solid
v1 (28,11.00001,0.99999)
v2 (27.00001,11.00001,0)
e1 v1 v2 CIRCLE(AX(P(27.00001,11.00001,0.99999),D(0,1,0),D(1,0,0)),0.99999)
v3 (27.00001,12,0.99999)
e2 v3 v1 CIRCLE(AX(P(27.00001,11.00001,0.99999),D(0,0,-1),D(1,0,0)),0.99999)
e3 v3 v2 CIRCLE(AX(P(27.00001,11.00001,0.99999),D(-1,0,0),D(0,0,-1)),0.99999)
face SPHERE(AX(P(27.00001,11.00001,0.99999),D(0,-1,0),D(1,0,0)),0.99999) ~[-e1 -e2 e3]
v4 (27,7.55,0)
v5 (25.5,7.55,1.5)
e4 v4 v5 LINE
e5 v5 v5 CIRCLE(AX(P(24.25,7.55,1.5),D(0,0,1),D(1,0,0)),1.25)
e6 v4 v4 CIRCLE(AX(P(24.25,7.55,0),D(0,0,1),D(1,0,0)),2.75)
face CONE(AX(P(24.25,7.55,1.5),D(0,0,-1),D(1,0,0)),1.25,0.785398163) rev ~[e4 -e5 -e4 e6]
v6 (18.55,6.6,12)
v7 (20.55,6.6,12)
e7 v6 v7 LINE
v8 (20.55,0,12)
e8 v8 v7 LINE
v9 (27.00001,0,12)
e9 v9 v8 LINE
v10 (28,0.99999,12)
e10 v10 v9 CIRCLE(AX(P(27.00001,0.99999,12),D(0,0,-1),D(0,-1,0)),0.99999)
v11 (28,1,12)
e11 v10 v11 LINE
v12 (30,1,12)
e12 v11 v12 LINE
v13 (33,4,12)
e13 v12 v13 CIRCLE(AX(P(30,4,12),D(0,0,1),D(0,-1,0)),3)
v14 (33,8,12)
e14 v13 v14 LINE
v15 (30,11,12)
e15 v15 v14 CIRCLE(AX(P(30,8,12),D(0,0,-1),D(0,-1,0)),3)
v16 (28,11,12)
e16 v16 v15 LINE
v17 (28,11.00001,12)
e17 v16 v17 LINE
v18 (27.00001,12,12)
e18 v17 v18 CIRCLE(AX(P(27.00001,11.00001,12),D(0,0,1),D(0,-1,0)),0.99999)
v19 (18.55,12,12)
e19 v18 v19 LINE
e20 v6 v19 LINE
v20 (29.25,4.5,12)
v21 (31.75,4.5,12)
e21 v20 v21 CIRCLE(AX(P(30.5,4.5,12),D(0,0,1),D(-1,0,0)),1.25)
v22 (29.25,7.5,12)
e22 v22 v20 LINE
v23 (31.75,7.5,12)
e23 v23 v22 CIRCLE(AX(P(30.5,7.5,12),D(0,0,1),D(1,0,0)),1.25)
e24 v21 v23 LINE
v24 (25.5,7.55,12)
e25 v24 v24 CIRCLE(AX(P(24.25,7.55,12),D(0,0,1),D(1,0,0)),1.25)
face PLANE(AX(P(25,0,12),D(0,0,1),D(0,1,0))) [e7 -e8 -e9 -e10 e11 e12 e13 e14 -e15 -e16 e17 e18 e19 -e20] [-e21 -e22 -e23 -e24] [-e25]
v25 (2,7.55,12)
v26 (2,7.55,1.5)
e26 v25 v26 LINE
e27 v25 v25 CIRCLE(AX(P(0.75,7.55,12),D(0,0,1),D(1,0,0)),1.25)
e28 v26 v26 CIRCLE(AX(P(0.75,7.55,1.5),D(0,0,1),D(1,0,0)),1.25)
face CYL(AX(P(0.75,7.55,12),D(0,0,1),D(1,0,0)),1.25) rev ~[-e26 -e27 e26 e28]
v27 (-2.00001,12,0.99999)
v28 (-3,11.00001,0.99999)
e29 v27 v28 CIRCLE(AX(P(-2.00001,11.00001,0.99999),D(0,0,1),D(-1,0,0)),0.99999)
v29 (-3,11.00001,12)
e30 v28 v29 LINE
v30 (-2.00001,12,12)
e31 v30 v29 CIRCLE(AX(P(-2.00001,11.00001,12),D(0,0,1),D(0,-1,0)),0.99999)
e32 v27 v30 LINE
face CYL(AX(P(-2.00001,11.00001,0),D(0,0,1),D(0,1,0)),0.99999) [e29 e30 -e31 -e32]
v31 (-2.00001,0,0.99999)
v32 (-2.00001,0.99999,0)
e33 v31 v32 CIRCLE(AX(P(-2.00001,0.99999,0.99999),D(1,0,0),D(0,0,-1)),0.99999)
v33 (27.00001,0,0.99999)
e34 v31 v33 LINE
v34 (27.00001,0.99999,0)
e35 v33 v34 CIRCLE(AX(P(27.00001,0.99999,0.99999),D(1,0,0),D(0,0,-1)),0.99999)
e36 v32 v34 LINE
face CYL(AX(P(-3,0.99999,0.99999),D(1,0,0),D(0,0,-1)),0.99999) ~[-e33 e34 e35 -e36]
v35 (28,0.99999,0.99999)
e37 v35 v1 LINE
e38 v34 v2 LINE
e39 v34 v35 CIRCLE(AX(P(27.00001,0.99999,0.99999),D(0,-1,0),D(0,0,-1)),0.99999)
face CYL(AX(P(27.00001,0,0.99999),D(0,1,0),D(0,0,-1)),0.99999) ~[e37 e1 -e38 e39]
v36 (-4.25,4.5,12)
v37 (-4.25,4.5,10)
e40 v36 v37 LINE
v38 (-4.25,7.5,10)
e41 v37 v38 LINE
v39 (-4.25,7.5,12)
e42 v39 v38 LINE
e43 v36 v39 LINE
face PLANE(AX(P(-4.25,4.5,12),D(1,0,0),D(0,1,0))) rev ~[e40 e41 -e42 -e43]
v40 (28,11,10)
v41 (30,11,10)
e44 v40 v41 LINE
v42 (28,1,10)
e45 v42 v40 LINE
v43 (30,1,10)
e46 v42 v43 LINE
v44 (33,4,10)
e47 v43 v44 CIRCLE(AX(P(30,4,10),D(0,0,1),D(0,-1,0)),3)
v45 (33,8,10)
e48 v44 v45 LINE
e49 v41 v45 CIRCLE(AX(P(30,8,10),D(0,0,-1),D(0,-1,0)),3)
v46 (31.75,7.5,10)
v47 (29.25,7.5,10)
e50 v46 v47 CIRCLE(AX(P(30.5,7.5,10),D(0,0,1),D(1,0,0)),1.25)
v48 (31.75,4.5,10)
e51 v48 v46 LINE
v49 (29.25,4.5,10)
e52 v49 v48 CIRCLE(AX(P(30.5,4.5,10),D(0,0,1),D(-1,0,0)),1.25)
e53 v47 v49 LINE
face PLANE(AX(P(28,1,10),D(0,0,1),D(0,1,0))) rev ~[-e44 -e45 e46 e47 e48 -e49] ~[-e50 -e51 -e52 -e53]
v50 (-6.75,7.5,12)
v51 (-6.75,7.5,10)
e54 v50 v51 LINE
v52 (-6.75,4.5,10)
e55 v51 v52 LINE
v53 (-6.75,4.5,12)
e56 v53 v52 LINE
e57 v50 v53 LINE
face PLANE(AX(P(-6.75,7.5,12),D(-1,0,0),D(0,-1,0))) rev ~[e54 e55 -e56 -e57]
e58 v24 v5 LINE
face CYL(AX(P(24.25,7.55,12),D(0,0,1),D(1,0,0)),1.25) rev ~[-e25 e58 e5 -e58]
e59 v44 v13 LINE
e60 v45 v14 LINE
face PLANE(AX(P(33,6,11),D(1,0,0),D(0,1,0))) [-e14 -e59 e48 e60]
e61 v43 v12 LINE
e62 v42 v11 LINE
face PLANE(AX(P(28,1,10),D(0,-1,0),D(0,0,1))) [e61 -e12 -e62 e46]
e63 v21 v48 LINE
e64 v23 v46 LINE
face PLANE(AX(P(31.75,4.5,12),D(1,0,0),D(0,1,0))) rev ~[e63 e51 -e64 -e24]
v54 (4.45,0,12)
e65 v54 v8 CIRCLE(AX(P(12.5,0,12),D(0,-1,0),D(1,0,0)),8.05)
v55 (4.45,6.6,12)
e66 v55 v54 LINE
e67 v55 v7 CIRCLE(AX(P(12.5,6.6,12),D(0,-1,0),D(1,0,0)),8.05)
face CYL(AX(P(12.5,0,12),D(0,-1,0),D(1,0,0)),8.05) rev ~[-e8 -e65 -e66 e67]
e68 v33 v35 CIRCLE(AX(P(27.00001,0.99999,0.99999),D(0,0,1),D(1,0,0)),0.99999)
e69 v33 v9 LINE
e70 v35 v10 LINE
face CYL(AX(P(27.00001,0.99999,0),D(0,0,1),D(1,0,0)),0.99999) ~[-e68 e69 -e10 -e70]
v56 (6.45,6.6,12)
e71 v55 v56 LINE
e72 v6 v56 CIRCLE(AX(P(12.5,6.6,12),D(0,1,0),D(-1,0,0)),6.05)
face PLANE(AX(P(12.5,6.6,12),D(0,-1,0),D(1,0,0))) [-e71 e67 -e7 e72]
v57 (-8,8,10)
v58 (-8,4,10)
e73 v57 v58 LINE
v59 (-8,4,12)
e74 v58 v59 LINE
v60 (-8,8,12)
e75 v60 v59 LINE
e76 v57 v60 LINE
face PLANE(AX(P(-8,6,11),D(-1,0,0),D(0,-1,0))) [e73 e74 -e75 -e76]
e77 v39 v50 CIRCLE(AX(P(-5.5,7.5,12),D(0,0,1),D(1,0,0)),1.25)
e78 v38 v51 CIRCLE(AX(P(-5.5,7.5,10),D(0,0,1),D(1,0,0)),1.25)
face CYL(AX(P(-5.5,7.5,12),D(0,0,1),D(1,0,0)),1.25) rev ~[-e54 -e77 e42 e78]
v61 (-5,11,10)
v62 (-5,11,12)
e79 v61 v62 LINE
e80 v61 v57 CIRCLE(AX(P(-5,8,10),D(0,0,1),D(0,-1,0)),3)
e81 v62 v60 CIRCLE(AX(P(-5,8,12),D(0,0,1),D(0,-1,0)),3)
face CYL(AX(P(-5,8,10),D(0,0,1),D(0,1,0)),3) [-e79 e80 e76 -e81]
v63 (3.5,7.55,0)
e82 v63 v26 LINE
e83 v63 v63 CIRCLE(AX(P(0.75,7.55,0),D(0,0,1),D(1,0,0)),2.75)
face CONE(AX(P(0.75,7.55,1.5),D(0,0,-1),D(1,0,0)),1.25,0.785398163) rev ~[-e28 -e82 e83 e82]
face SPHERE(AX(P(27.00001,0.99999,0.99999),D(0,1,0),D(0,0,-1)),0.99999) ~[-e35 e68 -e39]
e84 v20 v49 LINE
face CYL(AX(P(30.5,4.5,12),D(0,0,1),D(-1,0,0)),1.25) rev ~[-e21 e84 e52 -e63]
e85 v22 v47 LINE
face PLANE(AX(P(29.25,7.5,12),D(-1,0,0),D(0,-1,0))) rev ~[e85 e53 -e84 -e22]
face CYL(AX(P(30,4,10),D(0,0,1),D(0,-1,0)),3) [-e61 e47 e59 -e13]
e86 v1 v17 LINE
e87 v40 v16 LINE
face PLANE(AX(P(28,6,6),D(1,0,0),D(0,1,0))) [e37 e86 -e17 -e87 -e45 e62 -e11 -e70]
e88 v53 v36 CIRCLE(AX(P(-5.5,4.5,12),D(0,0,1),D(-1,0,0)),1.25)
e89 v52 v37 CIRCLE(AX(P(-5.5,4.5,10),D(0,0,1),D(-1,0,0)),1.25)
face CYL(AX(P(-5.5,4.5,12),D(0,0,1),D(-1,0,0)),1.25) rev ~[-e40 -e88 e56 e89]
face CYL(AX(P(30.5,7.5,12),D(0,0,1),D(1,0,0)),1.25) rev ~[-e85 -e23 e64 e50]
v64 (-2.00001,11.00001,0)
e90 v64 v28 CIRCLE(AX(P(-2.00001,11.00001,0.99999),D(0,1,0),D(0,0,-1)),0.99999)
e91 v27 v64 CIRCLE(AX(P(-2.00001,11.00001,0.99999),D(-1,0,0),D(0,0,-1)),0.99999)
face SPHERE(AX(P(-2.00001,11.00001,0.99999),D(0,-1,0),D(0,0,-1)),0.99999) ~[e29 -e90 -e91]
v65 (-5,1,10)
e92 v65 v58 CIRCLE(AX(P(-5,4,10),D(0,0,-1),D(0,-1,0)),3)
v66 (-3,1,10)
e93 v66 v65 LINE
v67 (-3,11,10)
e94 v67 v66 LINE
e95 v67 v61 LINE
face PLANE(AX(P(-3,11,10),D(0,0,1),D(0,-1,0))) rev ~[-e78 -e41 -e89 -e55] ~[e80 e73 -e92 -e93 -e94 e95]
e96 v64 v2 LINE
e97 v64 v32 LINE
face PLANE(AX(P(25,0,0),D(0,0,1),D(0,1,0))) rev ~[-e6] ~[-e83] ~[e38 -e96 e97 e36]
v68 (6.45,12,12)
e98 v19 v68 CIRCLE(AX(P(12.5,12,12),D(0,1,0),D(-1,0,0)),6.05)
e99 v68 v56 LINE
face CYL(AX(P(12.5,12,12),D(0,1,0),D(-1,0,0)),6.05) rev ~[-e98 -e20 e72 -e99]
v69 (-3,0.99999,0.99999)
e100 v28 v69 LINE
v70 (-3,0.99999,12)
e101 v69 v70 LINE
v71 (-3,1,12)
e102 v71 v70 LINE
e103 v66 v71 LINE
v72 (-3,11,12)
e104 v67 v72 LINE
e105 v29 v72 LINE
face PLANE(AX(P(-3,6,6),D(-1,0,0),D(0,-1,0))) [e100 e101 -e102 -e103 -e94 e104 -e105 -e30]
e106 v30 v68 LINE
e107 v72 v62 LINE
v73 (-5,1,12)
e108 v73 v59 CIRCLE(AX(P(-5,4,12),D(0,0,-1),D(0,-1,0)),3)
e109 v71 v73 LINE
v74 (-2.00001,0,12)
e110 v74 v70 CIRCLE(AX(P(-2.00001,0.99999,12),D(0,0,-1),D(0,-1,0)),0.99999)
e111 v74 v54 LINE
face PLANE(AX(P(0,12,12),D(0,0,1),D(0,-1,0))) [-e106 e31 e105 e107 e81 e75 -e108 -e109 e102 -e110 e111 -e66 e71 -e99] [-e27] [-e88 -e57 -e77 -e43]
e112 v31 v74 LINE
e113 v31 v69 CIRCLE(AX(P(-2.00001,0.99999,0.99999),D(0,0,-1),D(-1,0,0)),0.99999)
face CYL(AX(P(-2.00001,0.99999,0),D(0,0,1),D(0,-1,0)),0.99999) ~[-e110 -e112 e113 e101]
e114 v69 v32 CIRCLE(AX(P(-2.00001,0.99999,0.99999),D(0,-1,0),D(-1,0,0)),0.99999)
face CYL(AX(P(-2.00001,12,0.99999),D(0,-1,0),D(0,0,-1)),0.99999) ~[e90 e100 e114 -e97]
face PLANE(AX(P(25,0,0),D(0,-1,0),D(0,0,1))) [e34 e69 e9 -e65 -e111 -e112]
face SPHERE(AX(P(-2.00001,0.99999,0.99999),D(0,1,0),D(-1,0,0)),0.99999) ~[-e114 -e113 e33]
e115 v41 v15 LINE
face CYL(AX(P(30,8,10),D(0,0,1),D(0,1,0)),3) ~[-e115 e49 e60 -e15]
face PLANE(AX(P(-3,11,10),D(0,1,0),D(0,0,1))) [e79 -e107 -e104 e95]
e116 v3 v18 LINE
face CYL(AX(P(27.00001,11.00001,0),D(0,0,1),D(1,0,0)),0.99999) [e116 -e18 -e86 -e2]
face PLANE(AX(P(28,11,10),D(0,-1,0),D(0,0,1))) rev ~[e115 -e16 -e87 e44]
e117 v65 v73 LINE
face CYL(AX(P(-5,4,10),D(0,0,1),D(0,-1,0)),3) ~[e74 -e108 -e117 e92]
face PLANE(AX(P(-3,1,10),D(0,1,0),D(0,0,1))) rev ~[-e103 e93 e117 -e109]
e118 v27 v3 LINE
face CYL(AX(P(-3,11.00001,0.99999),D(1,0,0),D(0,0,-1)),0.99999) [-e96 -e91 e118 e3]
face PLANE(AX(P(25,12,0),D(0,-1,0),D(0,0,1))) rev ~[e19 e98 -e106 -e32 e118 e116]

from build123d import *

# Parameters (mm, degrees)
F0_W      = 25
F0_H      = 12
F1_DEPTH  = 12
F2_R      = 8.05
F3_DEPTH  = 6.6
F4_R      = 6.05
F5_DEPTH  = 5.4
F6_W      = 12
F6_H      = 12
F7_DEPTH  = 3
F8_W      = 12
F8_H      = 12
F9_DEPTH  = 3
F10_R     = 1.25
F11_DEPTH = 25
F12_SIZE  = 1.5
F13_R     = 0.99999
F14_W     = 10
F14_H     = 2
F15_DEPTH = 5
F16_W     = 10
F16_H     = 2
F17_DEPTH = 5
F19_DEPTH = 2
F20_R     = 3


# Not quite as in the source:
# - a fillet or chamfer is up to 0.001 mm smaller than in the source, because OpenCascade refuses the exact size


with BuildPart() as f1:
    # F0 (on Top) → F1 (new body)
    with BuildSketch(Plane.XY):
        with Locations((12.5, 6)):
            Rectangle(F0_W, F0_H)
    extrude(amount=F1_DEPTH)

    # F2 (on face) → F3 (cut)
    with BuildSketch(Plane.XZ):
        with Locations((12.5, 12)):
            Circle(F2_R)
    extrude(amount=-F3_DEPTH, mode=Mode.SUBTRACT)

    # F4 (on face) → F5 (cut)
    with BuildSketch(Plane(origin=(0, 12, 0), x_dir=(-1, 0, 0), z_dir=(0, 1, 0))):
        with Locations((-12.5, 12)):
            Circle(F4_R)
    extrude(amount=-F5_DEPTH, mode=Mode.SUBTRACT)

    # F6 (on face) → F7 (join)
    with BuildSketch(Plane(origin=(0, 0, 0), x_dir=(0, -1, 0), z_dir=(-1, 0, 0))):
        with Locations((-6, 6)):
            Rectangle(F6_W, F6_H)
    extrude(amount=F7_DEPTH)

    # F8 (on face) → F9 (join)
    with BuildSketch(Plane.YZ.offset(25)):
        with Locations((6, 6)):
            Rectangle(F8_W, F8_H)
    extrude(amount=F9_DEPTH)

    # F10 (on face) → F11 (cut)
    with BuildSketch(Plane.XY.offset(12)):
        with Locations((0.75, 7.55)):
            Circle(F10_R)
        with Locations((24.25, 7.55)):
            Circle(F10_R)
    extrude(amount=-F11_DEPTH, mode=Mode.SUBTRACT)

    # F12
    f12_edges = [f1.edges().sort_by_distance(p)[0] for p in [
        (23, 7.55, 0),
        (-0.5, 7.55, 0),
    ]]
    chamfer(f12_edges, length=F12_SIZE)

    # F13 (radius 1 in the source; OpenCascade refuses exactly that, so slightly less here)
    f13_edges = [f1.edges().sort_by_distance(p)[0] for p in [
        (28, 6, 0),
        (-3, 6, 0),
        (28, 12, 6),
        (12.5, 12, 0),
        (-3, 12, 6),
        (-3, 0, 6),
        (12.5, 0, 0),
        (28, 0, 6),
    ]]
    fillet(f13_edges, radius=F13_R)

    # F14 (on face) → F15 (join)
    with BuildSketch(Plane.YZ.offset(28)):
        with Locations((6, 11)):
            Rectangle(F14_W, F14_H)
    extrude(amount=F15_DEPTH)

    # F16 (on face) → F17 (join)
    with BuildSketch(Plane(origin=(-3, 0, 0), x_dir=(0, -1, 0), z_dir=(-1, 0, 0))):
        with Locations((-6, 11)):
            Rectangle(F16_W, F16_H)
    extrude(amount=F17_DEPTH)

    # F18 (on face) → F19 (cut, through all)
    with BuildSketch(Plane.XY.offset(12)):
        with BuildLine():
            ThreePointArc((-4.25, 7.5), (-5.5, 8.75), (-6.75, 7.5))
            Line((-6.75, 7.5), (-6.75, 4.5))
            ThreePointArc((-6.75, 4.5), (-5.5, 3.25), (-4.25, 4.5))
            Line((-4.25, 4.5), (-4.25, 7.5))
        make_face()
        with BuildLine():
            ThreePointArc((31.75, 7.5), (30.5, 8.75), (29.25, 7.5))
            Line((29.25, 7.5), (29.25, 4.5))
            ThreePointArc((29.25, 4.5), (30.5, 3.25), (31.75, 4.5))
            Line((31.75, 4.5), (31.75, 7.5))
        make_face()
    extrude(amount=-F19_DEPTH, mode=Mode.SUBTRACT)

    # F20
    f20_edges = [f1.edges().sort_by_distance(p)[0] for p in [
        (-8, 11, 11),
        (-8, 1, 11),
        (33, 11, 11),
        (33, 1, 11),
    ]]
    fillet(f20_edges, radius=F20_R)


solid = f1.part
